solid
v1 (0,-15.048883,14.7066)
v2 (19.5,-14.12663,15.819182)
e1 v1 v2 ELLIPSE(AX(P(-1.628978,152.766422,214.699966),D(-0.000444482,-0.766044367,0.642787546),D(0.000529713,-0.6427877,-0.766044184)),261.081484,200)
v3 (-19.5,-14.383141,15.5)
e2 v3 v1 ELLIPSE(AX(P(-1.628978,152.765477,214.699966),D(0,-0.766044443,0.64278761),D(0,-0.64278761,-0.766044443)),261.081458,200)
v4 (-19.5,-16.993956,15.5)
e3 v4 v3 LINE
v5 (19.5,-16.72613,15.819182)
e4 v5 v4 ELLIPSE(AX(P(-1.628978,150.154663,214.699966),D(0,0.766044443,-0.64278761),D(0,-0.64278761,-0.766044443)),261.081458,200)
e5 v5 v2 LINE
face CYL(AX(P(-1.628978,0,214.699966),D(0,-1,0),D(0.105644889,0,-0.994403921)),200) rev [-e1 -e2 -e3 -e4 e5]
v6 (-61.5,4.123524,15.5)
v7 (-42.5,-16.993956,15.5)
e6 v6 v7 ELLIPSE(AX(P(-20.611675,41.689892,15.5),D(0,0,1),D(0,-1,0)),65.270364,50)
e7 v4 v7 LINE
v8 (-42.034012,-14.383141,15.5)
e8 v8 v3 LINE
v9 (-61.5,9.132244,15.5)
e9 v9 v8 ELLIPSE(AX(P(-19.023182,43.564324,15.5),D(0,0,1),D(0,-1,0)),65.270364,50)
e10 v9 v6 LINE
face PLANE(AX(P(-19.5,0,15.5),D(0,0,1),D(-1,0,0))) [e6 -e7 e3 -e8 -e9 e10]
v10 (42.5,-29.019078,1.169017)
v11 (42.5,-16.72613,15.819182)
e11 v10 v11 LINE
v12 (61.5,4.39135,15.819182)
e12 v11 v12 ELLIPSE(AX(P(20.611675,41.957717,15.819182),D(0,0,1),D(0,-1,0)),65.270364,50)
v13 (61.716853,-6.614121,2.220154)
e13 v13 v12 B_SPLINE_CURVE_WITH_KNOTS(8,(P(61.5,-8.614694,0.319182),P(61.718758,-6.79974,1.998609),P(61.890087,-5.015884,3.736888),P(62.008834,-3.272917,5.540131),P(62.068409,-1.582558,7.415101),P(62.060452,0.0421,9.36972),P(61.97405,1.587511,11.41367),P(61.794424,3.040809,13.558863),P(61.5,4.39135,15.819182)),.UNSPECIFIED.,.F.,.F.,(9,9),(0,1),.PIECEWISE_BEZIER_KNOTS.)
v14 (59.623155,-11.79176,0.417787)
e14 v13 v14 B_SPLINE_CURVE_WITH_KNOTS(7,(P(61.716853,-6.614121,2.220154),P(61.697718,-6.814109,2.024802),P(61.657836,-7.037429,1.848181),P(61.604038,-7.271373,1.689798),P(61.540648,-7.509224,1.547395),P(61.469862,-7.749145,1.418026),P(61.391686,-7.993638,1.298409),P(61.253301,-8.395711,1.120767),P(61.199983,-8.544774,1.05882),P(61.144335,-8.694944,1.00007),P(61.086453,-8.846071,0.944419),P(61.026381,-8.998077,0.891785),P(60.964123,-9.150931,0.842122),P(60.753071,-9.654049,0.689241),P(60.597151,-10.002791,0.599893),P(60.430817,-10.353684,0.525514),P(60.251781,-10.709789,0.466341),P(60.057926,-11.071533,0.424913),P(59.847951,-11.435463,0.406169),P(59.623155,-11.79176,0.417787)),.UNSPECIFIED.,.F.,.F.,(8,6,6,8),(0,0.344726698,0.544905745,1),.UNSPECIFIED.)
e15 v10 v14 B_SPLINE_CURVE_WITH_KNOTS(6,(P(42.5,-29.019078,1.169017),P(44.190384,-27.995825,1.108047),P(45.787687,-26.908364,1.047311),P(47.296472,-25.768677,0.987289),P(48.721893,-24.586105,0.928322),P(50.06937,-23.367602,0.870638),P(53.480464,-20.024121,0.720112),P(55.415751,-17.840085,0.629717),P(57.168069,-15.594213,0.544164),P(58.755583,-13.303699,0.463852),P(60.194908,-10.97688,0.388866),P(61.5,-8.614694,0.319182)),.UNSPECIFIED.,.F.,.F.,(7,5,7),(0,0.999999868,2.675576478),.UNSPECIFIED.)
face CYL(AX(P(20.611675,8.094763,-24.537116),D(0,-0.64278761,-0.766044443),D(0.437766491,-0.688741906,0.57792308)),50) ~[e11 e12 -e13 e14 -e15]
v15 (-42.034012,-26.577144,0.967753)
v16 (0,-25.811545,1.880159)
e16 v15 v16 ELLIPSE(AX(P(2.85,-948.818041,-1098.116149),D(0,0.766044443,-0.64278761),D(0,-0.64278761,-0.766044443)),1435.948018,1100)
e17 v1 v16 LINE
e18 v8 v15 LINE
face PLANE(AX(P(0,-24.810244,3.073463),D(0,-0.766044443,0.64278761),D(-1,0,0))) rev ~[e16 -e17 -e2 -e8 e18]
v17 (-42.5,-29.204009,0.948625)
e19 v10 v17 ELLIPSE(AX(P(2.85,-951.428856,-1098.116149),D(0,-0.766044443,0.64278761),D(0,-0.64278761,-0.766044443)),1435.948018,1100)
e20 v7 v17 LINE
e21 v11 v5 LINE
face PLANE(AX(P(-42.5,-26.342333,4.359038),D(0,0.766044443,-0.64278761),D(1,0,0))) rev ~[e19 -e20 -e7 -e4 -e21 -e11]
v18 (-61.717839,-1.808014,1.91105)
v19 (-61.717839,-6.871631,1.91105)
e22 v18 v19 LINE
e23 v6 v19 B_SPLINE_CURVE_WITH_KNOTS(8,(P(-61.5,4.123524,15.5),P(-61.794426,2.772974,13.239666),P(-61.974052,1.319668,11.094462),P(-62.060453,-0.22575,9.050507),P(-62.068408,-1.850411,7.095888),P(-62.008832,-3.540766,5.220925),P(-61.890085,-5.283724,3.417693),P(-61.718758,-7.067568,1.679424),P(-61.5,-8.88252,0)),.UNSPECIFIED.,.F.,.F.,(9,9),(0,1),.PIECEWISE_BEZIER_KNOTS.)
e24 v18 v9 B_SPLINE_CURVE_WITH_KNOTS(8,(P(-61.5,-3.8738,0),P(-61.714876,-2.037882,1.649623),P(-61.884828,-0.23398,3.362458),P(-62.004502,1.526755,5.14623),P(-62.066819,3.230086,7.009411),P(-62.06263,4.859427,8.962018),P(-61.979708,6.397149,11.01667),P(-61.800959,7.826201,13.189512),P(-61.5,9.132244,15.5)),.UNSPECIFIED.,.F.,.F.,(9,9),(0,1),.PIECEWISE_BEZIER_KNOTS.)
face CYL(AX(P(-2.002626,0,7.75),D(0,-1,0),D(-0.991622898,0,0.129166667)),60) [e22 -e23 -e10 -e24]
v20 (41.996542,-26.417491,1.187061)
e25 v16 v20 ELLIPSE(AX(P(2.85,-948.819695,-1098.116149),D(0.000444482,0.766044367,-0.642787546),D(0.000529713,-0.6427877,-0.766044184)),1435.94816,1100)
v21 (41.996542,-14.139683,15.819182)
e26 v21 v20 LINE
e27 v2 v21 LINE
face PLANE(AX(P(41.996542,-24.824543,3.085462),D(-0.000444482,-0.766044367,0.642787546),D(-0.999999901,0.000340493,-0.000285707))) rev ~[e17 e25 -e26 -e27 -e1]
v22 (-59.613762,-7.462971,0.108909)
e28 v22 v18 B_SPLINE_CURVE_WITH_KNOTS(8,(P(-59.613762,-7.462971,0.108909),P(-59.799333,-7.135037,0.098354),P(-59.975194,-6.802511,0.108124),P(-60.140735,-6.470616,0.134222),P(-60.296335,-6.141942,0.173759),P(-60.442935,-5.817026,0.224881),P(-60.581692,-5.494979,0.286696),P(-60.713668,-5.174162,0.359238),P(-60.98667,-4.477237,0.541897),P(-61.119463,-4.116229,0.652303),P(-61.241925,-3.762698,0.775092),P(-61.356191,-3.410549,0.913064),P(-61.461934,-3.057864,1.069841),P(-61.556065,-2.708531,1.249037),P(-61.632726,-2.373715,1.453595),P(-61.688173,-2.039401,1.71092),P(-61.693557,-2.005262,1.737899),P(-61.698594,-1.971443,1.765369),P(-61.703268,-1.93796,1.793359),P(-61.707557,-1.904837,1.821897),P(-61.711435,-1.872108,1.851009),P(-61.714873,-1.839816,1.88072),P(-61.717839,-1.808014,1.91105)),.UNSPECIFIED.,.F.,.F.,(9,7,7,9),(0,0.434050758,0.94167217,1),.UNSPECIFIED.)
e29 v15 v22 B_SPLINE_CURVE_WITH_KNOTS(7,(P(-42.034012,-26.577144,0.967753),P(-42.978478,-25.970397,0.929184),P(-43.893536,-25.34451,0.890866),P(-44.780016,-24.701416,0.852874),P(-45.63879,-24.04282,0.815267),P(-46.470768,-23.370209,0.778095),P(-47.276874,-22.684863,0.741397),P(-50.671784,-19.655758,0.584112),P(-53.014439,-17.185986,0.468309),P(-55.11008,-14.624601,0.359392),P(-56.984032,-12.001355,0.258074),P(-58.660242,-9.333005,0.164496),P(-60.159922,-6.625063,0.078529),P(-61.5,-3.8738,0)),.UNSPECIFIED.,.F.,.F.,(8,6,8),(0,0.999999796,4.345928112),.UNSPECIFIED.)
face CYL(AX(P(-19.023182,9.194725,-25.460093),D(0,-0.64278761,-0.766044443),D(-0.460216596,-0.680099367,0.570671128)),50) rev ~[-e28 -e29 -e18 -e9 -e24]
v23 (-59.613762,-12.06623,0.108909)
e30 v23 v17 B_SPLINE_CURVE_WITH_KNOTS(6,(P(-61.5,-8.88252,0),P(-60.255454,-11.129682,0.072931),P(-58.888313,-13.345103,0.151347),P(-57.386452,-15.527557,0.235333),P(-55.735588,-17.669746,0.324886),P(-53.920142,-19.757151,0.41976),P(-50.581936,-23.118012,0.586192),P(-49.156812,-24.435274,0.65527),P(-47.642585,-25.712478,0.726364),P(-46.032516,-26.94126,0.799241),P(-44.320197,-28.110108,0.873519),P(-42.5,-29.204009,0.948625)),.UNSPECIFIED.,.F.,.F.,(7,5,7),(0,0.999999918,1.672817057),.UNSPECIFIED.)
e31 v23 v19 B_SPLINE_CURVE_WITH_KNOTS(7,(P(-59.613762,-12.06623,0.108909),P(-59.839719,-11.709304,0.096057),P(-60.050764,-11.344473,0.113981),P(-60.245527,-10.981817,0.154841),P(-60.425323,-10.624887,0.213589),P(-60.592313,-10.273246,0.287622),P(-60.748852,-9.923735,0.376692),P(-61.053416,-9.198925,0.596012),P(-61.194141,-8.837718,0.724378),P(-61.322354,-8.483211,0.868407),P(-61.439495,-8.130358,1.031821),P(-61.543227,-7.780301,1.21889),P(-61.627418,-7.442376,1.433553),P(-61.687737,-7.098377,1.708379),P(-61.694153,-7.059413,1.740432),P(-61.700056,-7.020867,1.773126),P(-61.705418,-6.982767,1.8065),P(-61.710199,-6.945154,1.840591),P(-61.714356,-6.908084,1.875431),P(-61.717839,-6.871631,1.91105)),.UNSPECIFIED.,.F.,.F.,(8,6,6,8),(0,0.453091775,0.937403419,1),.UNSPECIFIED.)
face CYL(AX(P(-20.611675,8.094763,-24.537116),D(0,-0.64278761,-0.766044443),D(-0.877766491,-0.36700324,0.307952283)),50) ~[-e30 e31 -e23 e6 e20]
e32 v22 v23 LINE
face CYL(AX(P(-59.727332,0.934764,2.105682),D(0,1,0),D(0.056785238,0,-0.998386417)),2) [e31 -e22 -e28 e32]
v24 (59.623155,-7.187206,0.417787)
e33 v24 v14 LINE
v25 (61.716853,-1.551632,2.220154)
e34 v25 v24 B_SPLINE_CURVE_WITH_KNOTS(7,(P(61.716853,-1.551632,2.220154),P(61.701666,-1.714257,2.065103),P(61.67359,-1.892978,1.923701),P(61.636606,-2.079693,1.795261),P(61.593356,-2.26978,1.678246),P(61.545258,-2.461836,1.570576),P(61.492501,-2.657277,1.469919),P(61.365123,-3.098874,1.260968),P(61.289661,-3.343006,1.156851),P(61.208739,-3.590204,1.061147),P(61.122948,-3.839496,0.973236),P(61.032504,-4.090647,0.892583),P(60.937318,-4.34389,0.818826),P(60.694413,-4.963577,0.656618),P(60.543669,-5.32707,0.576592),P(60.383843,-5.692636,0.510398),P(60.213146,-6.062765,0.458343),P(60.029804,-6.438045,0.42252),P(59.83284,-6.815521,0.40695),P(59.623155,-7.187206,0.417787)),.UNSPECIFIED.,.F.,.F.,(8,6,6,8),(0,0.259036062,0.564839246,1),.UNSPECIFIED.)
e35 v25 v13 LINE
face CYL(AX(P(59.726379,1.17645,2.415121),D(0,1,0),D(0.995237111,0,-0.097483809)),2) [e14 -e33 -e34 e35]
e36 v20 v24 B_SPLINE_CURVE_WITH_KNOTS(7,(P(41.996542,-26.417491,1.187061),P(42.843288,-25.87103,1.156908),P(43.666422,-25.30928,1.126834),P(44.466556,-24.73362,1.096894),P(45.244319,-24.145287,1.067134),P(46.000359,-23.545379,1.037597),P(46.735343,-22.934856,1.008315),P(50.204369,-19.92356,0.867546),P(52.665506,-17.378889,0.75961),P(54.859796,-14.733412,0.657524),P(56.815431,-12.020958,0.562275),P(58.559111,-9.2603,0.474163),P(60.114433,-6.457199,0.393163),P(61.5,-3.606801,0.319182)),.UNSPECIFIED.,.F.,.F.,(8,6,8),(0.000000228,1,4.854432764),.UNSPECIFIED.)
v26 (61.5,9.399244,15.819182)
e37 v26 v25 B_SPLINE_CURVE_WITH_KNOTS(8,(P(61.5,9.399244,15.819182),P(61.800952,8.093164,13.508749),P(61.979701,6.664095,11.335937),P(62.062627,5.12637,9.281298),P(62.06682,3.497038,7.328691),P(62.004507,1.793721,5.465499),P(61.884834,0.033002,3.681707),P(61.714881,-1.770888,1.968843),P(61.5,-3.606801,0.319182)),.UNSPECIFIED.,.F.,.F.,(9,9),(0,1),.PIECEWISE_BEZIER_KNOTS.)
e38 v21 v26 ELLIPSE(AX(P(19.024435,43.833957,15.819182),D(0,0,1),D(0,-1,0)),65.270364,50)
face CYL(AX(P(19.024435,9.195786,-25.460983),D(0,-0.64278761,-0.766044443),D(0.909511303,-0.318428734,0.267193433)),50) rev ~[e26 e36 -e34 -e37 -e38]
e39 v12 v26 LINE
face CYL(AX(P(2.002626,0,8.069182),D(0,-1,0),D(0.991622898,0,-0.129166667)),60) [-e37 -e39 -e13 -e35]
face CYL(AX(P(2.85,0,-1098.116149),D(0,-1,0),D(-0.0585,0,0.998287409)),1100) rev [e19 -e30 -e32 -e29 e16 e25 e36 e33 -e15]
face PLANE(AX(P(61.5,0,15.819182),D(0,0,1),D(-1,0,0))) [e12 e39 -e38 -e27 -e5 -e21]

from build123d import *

# Parameters (mm, degrees)
F1_DEPTH      = 40
F1_DEPTH_BACK = 11
F4_DEPTH      = 35
F4_DEPTH_BACK = 27.9057510197
F5_T1_DEPTH   = 14.5743949702
F5_T3_DEPTH   = 14.6258479297


# Not quite as in the source:
# - a fillet or chamfer that OpenCascade refuses, or shapes differently, is made with other operations: its cross-section is extruded or revolved along the edge and cut away or added


with BuildPart() as f1:
    # F0 (on Front) → F1 (new body, two sides)
    with BuildSketch(Plane.XZ) as f1_sk:
        with BuildLine():
            Line((-19.5, 15.5), (-61.5, 15.5))
            ThreePointArc((-61.5, 15.5), (-62.0026261084, 7.75), (-61.5, 0))
            ThreePointArc((-61.5, 0), (-0.0044648026, 1.8801470046), (61.5, 0.319182139))
            ThreePointArc((61.5, 0.319182139), (62.0026261084, 8.069182139), (61.5, 15.819182139))
            Line((61.5, 15.819182139), (19.5, 15.819182139))
            ThreePointArc((19.5, 15.819182139), (0.0077989053, 14.7066639823), (-19.5, 15.5))
        make_face()
    extrude(amount=F1_DEPTH)
    extrude(f1_sk.sketch, amount=-F1_DEPTH_BACK)

    # F3 (on face) → F4 (cut, two sides)
    with BuildSketch(Plane(origin=(0, -8.7376098383, -10.4130779155), x_dir=(1, 0, 0), z_dir=(0, -0.6427876097, -0.7660444431))) as f4_sk:
        with BuildLine():
            Line((41.9965417924, 21), (0, 20.9813332936))
            Line((0, 20.9813332936), (-42.034011751, 20.9813332936))
            ThreePointArc((-42.034011751, 20.9813332936), (-55.2445439017, 11.0585633209), (-64.5, -2.6277822851))
            Line((-64.5, -2.6277822851), (-64.5, -10.626510717))
            Line((-64.5, -10.626510717), (-64.5, -28.2158330083))
            Line((-64.5, -28.2158330083), (0, -28.2158330083))
            Line((0, -28.2158330083), (64.5, -28.2158330083))
            Line((64.5, -28.2158330083), (64.5, -12.4673116952))
            Line((64.5, -12.4673116952), (64.5, -2.6264255467))
            ThreePointArc((64.5, -2.6264255467), (55.2297238243, 11.0740614176), (41.9965417924, 21))
        make_face()
        with BuildLine():
            Line((64.5, 1.9813332936), (64.5, 22.9813332936))
            Line((64.5, 22.9813332936), (64.5, 52.9813332936))
            Line((64.5, 52.9813332936), (-64.5, 52.9813332936))
            Line((-64.5, 52.9813332936), (-64.5, 22.9813332936))
            Line((-64.5, 22.9813332936), (-64.5, 1.9813332936))
            ThreePointArc((-64.5, 1.9813332936), (-55.1354627813, 14.1946752549), (-42.5, 22.9813332936))
            Line((-42.5, 22.9813332936), (42.5, 22.9813332936))
            ThreePointArc((42.5, 22.9813332936), (55.1354627813, 14.1946752549), (64.5, 1.9813332936))
        make_face()
    extrude(amount=-F4_DEPTH, mode=Mode.SUBTRACT)
    extrude(f4_sk.sketch, amount=F4_DEPTH_BACK, mode=Mode.SUBTRACT)

    # F5: fillet of radius 2 on 2 edges, made by hand

    # F5_s2 → F5_t1 (cut)
    with BuildSketch(Plane.XZ.offset(-1.1764499881)):
        with BuildLine():
            ThreePointArc((61.7168527659, 2.2201536136), (61.0312003552, 0.8993903708), (59.6231546265, 0.4177868017))
            ThreePointArc((59.6231546265, 0.4177868017), (60.5615983725, 0.3688853121), (61.5, 0.319182139))
            ThreePointArc((61.5, 0.319182139), (61.6160042169, 1.2688034371), (61.7168527659, 2.2201536136))
        make_face()
    extrude(amount=F5_T1_DEPTH, mode=Mode.SUBTRACT)

    # F5_s4 → F5_t3 (cut)
    with BuildSketch(Plane.XZ.offset(-0.9347638385)):
        with BuildLine():
            ThreePointArc((-59.6137615285, 0.1089088503), (-61.0283512081, 0.5866856233), (-61.7178391039, 1.9110500173))
            ThreePointArc((-61.7178391039, 1.9110500173), (-61.6165778825, 0.9546520415), (-61.5, 0))
            ThreePointArc((-61.5, 0), (-60.5569041472, 0.0548594049), (-59.6137615285, 0.1089088503))
        make_face()
    extrude(amount=F5_T3_DEPTH, mode=Mode.SUBTRACT)


solid = f1.part
